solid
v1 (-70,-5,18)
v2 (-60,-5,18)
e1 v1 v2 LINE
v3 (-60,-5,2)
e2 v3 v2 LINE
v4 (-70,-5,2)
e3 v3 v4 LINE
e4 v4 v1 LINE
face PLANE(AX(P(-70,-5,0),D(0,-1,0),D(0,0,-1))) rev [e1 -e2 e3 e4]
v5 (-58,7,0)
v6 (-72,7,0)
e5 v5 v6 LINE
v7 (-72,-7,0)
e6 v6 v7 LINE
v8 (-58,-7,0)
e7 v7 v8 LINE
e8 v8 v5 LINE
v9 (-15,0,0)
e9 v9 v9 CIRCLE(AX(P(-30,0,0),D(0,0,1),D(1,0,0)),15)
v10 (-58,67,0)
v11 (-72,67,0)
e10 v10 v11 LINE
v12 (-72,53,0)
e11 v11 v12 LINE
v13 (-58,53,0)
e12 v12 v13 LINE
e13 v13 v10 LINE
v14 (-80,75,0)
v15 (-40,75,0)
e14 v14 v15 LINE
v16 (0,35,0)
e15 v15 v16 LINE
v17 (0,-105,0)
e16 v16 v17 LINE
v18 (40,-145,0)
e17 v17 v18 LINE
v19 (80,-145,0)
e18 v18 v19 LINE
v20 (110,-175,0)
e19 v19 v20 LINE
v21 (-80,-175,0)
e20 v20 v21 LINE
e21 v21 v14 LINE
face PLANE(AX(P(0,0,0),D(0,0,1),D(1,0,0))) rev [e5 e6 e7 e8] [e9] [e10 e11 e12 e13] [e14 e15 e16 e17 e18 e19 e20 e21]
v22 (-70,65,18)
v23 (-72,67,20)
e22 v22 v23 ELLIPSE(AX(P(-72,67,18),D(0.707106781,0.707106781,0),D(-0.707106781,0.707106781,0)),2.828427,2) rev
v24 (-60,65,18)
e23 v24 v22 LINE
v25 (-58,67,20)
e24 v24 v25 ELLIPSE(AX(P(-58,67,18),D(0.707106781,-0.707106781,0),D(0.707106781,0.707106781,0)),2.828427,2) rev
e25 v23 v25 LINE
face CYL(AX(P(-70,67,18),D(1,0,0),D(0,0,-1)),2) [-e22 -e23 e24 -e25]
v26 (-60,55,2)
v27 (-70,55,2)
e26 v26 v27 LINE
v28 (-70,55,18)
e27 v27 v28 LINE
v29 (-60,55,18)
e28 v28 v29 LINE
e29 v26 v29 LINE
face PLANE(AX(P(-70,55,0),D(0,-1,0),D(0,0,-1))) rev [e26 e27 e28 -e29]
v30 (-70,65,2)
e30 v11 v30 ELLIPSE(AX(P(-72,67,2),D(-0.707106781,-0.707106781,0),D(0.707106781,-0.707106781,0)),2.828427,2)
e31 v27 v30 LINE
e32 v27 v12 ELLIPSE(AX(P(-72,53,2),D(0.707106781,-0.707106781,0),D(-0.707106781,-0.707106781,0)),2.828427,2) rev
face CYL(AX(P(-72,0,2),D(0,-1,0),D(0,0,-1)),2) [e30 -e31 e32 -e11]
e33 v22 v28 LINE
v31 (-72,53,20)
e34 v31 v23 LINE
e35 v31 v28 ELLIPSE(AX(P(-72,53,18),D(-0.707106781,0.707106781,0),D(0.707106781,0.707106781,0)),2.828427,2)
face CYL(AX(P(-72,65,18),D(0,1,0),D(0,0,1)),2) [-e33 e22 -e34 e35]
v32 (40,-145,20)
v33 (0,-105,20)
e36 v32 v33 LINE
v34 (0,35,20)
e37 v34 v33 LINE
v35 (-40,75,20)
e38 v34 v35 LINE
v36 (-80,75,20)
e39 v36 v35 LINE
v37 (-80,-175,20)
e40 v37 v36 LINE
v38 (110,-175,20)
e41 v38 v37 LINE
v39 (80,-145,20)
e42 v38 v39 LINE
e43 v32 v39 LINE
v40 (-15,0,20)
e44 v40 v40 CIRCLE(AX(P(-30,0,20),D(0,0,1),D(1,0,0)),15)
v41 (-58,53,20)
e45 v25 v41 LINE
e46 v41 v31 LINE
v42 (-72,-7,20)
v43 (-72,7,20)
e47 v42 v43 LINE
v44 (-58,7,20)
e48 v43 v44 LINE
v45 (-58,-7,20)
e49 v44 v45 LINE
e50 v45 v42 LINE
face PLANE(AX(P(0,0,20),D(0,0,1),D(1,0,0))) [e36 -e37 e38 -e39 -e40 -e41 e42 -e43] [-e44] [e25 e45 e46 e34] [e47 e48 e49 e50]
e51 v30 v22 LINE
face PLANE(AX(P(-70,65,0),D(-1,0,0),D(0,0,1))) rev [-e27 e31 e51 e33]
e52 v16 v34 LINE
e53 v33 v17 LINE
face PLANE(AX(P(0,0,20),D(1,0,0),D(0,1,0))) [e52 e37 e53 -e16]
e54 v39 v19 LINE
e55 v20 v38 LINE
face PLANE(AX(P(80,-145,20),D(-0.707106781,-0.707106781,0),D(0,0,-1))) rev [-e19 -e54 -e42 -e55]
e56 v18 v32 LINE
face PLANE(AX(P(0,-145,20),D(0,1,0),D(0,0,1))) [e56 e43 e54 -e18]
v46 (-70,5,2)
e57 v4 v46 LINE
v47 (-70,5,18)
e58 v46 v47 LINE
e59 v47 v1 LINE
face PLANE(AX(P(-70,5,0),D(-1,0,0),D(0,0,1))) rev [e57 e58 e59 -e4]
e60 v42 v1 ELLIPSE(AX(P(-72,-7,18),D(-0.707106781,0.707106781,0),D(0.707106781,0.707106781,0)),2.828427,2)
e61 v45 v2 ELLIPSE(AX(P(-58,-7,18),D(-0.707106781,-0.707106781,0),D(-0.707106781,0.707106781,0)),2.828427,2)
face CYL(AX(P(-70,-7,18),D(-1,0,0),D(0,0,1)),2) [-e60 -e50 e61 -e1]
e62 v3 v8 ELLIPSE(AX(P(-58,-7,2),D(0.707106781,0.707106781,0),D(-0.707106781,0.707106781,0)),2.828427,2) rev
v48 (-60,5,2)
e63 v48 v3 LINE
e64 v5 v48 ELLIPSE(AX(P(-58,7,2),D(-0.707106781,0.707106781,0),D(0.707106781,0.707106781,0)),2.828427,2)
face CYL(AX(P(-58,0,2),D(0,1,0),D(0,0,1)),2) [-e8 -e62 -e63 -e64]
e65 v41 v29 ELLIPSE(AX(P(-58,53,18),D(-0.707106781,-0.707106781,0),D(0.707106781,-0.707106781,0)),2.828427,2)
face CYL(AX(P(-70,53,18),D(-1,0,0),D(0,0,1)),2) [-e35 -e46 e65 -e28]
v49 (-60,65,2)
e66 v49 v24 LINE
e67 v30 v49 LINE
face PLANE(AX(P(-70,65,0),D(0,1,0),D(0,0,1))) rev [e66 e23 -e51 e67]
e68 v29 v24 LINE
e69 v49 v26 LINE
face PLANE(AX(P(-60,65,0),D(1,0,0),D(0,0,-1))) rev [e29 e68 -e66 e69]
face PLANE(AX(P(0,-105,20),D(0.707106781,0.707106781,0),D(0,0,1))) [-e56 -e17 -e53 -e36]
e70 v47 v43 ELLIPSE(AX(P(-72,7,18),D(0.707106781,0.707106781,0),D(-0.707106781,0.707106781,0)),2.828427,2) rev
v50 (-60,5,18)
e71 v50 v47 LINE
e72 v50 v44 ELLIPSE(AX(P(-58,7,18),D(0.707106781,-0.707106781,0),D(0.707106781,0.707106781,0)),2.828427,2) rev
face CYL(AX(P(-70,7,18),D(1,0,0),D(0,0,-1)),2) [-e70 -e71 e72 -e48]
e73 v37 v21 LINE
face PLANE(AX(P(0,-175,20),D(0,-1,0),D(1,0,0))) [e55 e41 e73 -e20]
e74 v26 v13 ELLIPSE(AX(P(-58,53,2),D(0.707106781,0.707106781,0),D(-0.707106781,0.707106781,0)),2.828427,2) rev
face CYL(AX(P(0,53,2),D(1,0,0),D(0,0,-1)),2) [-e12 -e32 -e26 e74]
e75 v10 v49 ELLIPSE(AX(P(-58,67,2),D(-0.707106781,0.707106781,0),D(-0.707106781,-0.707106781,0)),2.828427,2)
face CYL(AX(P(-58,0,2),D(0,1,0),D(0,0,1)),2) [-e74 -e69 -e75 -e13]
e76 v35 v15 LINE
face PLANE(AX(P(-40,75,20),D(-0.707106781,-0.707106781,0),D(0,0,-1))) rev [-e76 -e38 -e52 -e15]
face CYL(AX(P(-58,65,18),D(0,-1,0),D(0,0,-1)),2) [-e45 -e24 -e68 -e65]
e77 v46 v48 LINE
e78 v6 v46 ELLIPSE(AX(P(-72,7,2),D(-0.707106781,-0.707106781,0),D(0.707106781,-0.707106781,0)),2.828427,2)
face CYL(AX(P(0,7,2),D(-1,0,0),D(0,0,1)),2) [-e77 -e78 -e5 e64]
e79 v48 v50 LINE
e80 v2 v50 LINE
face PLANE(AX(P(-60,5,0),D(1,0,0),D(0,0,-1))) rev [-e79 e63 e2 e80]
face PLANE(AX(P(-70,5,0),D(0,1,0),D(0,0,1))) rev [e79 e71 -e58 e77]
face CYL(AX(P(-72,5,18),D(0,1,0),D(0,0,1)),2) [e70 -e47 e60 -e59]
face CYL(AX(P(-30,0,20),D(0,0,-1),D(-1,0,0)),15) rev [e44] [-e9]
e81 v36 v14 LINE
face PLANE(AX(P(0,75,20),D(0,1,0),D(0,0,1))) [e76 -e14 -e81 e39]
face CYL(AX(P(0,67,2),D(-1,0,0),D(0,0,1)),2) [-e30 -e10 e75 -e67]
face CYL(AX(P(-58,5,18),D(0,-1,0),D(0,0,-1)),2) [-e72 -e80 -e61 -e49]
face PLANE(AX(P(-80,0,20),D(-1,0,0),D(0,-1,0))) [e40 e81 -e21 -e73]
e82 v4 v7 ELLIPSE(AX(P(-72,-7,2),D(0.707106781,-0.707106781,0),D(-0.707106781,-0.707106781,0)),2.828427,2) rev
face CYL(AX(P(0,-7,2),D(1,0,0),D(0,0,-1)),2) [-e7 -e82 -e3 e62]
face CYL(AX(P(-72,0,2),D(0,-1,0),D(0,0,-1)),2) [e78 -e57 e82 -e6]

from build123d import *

# Parameters (mm, degrees)
SKETCH3_R           = 15
SKETCH3_W           = 80
SKETCH3_H           = 30
BOSS_EXTRUDE2_DEPTH = 20
SKETCH4_W           = 10
SKETCH4_H           = 10
CUT_EXTRUDE1_DEPTH  = 20
CHAMFER1_SIZE       = 40
FILLET1_R           = 2


with BuildPart() as part:
    # Sketch3 → Boss-Extrude2 (new body)
    # profile 1 of 7: a face of its own
    with BuildSketch(Plane.XY):
        Polygon((-80, 75), (-80, 25), (-80, -26.993709631), (-80, -145), (0, -145), (0, 75), align=None)
        with Locations((-30, 0)):
            Circle(SKETCH3_R, mode=Mode.SUBTRACT)
    # profile 2 of 7: a face of its own
    with BuildSketch(Plane.XY):
        Polygon((-80, 75), (-80, 25), (-80, -26.993709631), (-80, -145), (0, -145), (0, 75), align=None)
        with Locations((-30, 0)):
            Circle(SKETCH3_R, mode=Mode.SUBTRACT)
    # profile 3 of 7: a face of its own
    with BuildSketch(Plane.XY):
        Polygon((-80, 75), (-80, 25), (-80, -26.993709631), (-80, -145), (0, -145), (0, 75), align=None)
        with Locations((-30, 0)):
            Circle(SKETCH3_R, mode=Mode.SUBTRACT)
    # profile 4 of 7: a face of its own
    with BuildSketch(Plane.XY):
        with Locations((-40, -160)):
            Rectangle(SKETCH3_W, SKETCH3_H)
    # profile 5 of 7: a face of its own
    with BuildSketch(Plane.XY):
        with Locations((-40, -160)):
            Rectangle(SKETCH3_W, SKETCH3_H)
    # profile 6 of 7: a face of its own
    with BuildSketch(Plane.XY):
        with Locations((-40, -160)):
            Rectangle(SKETCH3_W, SKETCH3_H)
    # profile 7 of 7: a face of its own
    with BuildSketch(Plane.XY):
        Polygon((120, -145), (0, -145), (0, -175), (53.438707699, -175), (120, -175), align=None)
    extrude(amount=BOSS_EXTRUDE2_DEPTH)

    # Sketch4 → Cut-Extrude1 (cut)
    with BuildSketch(Plane.XY.offset(20)):
        with Locations((-65, 60)):
            Rectangle(SKETCH4_W, SKETCH4_H)
        with Locations((-65, 0)):
            Rectangle(SKETCH4_W, SKETCH4_H)
    extrude(amount=-CUT_EXTRUDE1_DEPTH, mode=Mode.SUBTRACT)

    # Chamfer1
    # the kernel refuses this chamfer: 40 mm, written as the material it adds along each edge
    with BuildSketch(Plane(origin=(0, -145, 0), x_dir=(-0.027495876610586535, 0.9996219169112968, 0), z_dir=(0, 0, 1))) as chamfer1_piece_1:
        Polygon((CHAMFER1_SIZE * 0.999621916911, -CHAMFER1_SIZE * 0.0274958766106), (-CHAMFER1_SIZE * 0.0274958766106, -CHAMFER1_SIZE * 0.999621916911), (0, 0), align=None)
    extrude(amount=20)
    # the kernel refuses this chamfer: 40 mm, written as the material it takes off along each edge
    with BuildSketch(Plane(origin=(120, -145, -102.867319519), x_dir=(-0.9996219169112968, 0.027495876610586317, 0), z_dir=(0, 0, 1)), Plane(origin=(0, 75, -102.867319519), x_dir=(-0.9996219169112968, 0.027495876610586317, 0), z_dir=(0, 0, 1))) as chamfer1_2_piece_1:
        Polygon((CHAMFER1_SIZE * 0.999621916911, CHAMFER1_SIZE * 0.0274958766106), (-CHAMFER1_SIZE * 0.0274958766106, CHAMFER1_SIZE * 0.999621916911), (0, 0), align=None)
    extrude(amount=225.734639037, mode=Mode.SUBTRACT)

    # Fillet1
    fillet1_edges = [part.edges().sort_by_distance(p)[0] for p in [
        (-70, 60, 0),
        (-65, 65, 0),
        (-60, 60, 0),
        (-65, 55, 0),
        (-70, 60, 20),
        (-65, 55, 20),
        (-60, 60, 20),
        (-65, 65, 20),
        (-70, 0, 0),
        (-65, 5, 0),
        (-60, 0, 0),
        (-65, -5, 0),
        (-70, 0, 20),
        (-65, -5, 20),
        (-60, 0, 20),
        (-65, 5, 20),
    ]]
    fillet(fillet1_edges, radius=FILLET1_R)


solid = part.part
